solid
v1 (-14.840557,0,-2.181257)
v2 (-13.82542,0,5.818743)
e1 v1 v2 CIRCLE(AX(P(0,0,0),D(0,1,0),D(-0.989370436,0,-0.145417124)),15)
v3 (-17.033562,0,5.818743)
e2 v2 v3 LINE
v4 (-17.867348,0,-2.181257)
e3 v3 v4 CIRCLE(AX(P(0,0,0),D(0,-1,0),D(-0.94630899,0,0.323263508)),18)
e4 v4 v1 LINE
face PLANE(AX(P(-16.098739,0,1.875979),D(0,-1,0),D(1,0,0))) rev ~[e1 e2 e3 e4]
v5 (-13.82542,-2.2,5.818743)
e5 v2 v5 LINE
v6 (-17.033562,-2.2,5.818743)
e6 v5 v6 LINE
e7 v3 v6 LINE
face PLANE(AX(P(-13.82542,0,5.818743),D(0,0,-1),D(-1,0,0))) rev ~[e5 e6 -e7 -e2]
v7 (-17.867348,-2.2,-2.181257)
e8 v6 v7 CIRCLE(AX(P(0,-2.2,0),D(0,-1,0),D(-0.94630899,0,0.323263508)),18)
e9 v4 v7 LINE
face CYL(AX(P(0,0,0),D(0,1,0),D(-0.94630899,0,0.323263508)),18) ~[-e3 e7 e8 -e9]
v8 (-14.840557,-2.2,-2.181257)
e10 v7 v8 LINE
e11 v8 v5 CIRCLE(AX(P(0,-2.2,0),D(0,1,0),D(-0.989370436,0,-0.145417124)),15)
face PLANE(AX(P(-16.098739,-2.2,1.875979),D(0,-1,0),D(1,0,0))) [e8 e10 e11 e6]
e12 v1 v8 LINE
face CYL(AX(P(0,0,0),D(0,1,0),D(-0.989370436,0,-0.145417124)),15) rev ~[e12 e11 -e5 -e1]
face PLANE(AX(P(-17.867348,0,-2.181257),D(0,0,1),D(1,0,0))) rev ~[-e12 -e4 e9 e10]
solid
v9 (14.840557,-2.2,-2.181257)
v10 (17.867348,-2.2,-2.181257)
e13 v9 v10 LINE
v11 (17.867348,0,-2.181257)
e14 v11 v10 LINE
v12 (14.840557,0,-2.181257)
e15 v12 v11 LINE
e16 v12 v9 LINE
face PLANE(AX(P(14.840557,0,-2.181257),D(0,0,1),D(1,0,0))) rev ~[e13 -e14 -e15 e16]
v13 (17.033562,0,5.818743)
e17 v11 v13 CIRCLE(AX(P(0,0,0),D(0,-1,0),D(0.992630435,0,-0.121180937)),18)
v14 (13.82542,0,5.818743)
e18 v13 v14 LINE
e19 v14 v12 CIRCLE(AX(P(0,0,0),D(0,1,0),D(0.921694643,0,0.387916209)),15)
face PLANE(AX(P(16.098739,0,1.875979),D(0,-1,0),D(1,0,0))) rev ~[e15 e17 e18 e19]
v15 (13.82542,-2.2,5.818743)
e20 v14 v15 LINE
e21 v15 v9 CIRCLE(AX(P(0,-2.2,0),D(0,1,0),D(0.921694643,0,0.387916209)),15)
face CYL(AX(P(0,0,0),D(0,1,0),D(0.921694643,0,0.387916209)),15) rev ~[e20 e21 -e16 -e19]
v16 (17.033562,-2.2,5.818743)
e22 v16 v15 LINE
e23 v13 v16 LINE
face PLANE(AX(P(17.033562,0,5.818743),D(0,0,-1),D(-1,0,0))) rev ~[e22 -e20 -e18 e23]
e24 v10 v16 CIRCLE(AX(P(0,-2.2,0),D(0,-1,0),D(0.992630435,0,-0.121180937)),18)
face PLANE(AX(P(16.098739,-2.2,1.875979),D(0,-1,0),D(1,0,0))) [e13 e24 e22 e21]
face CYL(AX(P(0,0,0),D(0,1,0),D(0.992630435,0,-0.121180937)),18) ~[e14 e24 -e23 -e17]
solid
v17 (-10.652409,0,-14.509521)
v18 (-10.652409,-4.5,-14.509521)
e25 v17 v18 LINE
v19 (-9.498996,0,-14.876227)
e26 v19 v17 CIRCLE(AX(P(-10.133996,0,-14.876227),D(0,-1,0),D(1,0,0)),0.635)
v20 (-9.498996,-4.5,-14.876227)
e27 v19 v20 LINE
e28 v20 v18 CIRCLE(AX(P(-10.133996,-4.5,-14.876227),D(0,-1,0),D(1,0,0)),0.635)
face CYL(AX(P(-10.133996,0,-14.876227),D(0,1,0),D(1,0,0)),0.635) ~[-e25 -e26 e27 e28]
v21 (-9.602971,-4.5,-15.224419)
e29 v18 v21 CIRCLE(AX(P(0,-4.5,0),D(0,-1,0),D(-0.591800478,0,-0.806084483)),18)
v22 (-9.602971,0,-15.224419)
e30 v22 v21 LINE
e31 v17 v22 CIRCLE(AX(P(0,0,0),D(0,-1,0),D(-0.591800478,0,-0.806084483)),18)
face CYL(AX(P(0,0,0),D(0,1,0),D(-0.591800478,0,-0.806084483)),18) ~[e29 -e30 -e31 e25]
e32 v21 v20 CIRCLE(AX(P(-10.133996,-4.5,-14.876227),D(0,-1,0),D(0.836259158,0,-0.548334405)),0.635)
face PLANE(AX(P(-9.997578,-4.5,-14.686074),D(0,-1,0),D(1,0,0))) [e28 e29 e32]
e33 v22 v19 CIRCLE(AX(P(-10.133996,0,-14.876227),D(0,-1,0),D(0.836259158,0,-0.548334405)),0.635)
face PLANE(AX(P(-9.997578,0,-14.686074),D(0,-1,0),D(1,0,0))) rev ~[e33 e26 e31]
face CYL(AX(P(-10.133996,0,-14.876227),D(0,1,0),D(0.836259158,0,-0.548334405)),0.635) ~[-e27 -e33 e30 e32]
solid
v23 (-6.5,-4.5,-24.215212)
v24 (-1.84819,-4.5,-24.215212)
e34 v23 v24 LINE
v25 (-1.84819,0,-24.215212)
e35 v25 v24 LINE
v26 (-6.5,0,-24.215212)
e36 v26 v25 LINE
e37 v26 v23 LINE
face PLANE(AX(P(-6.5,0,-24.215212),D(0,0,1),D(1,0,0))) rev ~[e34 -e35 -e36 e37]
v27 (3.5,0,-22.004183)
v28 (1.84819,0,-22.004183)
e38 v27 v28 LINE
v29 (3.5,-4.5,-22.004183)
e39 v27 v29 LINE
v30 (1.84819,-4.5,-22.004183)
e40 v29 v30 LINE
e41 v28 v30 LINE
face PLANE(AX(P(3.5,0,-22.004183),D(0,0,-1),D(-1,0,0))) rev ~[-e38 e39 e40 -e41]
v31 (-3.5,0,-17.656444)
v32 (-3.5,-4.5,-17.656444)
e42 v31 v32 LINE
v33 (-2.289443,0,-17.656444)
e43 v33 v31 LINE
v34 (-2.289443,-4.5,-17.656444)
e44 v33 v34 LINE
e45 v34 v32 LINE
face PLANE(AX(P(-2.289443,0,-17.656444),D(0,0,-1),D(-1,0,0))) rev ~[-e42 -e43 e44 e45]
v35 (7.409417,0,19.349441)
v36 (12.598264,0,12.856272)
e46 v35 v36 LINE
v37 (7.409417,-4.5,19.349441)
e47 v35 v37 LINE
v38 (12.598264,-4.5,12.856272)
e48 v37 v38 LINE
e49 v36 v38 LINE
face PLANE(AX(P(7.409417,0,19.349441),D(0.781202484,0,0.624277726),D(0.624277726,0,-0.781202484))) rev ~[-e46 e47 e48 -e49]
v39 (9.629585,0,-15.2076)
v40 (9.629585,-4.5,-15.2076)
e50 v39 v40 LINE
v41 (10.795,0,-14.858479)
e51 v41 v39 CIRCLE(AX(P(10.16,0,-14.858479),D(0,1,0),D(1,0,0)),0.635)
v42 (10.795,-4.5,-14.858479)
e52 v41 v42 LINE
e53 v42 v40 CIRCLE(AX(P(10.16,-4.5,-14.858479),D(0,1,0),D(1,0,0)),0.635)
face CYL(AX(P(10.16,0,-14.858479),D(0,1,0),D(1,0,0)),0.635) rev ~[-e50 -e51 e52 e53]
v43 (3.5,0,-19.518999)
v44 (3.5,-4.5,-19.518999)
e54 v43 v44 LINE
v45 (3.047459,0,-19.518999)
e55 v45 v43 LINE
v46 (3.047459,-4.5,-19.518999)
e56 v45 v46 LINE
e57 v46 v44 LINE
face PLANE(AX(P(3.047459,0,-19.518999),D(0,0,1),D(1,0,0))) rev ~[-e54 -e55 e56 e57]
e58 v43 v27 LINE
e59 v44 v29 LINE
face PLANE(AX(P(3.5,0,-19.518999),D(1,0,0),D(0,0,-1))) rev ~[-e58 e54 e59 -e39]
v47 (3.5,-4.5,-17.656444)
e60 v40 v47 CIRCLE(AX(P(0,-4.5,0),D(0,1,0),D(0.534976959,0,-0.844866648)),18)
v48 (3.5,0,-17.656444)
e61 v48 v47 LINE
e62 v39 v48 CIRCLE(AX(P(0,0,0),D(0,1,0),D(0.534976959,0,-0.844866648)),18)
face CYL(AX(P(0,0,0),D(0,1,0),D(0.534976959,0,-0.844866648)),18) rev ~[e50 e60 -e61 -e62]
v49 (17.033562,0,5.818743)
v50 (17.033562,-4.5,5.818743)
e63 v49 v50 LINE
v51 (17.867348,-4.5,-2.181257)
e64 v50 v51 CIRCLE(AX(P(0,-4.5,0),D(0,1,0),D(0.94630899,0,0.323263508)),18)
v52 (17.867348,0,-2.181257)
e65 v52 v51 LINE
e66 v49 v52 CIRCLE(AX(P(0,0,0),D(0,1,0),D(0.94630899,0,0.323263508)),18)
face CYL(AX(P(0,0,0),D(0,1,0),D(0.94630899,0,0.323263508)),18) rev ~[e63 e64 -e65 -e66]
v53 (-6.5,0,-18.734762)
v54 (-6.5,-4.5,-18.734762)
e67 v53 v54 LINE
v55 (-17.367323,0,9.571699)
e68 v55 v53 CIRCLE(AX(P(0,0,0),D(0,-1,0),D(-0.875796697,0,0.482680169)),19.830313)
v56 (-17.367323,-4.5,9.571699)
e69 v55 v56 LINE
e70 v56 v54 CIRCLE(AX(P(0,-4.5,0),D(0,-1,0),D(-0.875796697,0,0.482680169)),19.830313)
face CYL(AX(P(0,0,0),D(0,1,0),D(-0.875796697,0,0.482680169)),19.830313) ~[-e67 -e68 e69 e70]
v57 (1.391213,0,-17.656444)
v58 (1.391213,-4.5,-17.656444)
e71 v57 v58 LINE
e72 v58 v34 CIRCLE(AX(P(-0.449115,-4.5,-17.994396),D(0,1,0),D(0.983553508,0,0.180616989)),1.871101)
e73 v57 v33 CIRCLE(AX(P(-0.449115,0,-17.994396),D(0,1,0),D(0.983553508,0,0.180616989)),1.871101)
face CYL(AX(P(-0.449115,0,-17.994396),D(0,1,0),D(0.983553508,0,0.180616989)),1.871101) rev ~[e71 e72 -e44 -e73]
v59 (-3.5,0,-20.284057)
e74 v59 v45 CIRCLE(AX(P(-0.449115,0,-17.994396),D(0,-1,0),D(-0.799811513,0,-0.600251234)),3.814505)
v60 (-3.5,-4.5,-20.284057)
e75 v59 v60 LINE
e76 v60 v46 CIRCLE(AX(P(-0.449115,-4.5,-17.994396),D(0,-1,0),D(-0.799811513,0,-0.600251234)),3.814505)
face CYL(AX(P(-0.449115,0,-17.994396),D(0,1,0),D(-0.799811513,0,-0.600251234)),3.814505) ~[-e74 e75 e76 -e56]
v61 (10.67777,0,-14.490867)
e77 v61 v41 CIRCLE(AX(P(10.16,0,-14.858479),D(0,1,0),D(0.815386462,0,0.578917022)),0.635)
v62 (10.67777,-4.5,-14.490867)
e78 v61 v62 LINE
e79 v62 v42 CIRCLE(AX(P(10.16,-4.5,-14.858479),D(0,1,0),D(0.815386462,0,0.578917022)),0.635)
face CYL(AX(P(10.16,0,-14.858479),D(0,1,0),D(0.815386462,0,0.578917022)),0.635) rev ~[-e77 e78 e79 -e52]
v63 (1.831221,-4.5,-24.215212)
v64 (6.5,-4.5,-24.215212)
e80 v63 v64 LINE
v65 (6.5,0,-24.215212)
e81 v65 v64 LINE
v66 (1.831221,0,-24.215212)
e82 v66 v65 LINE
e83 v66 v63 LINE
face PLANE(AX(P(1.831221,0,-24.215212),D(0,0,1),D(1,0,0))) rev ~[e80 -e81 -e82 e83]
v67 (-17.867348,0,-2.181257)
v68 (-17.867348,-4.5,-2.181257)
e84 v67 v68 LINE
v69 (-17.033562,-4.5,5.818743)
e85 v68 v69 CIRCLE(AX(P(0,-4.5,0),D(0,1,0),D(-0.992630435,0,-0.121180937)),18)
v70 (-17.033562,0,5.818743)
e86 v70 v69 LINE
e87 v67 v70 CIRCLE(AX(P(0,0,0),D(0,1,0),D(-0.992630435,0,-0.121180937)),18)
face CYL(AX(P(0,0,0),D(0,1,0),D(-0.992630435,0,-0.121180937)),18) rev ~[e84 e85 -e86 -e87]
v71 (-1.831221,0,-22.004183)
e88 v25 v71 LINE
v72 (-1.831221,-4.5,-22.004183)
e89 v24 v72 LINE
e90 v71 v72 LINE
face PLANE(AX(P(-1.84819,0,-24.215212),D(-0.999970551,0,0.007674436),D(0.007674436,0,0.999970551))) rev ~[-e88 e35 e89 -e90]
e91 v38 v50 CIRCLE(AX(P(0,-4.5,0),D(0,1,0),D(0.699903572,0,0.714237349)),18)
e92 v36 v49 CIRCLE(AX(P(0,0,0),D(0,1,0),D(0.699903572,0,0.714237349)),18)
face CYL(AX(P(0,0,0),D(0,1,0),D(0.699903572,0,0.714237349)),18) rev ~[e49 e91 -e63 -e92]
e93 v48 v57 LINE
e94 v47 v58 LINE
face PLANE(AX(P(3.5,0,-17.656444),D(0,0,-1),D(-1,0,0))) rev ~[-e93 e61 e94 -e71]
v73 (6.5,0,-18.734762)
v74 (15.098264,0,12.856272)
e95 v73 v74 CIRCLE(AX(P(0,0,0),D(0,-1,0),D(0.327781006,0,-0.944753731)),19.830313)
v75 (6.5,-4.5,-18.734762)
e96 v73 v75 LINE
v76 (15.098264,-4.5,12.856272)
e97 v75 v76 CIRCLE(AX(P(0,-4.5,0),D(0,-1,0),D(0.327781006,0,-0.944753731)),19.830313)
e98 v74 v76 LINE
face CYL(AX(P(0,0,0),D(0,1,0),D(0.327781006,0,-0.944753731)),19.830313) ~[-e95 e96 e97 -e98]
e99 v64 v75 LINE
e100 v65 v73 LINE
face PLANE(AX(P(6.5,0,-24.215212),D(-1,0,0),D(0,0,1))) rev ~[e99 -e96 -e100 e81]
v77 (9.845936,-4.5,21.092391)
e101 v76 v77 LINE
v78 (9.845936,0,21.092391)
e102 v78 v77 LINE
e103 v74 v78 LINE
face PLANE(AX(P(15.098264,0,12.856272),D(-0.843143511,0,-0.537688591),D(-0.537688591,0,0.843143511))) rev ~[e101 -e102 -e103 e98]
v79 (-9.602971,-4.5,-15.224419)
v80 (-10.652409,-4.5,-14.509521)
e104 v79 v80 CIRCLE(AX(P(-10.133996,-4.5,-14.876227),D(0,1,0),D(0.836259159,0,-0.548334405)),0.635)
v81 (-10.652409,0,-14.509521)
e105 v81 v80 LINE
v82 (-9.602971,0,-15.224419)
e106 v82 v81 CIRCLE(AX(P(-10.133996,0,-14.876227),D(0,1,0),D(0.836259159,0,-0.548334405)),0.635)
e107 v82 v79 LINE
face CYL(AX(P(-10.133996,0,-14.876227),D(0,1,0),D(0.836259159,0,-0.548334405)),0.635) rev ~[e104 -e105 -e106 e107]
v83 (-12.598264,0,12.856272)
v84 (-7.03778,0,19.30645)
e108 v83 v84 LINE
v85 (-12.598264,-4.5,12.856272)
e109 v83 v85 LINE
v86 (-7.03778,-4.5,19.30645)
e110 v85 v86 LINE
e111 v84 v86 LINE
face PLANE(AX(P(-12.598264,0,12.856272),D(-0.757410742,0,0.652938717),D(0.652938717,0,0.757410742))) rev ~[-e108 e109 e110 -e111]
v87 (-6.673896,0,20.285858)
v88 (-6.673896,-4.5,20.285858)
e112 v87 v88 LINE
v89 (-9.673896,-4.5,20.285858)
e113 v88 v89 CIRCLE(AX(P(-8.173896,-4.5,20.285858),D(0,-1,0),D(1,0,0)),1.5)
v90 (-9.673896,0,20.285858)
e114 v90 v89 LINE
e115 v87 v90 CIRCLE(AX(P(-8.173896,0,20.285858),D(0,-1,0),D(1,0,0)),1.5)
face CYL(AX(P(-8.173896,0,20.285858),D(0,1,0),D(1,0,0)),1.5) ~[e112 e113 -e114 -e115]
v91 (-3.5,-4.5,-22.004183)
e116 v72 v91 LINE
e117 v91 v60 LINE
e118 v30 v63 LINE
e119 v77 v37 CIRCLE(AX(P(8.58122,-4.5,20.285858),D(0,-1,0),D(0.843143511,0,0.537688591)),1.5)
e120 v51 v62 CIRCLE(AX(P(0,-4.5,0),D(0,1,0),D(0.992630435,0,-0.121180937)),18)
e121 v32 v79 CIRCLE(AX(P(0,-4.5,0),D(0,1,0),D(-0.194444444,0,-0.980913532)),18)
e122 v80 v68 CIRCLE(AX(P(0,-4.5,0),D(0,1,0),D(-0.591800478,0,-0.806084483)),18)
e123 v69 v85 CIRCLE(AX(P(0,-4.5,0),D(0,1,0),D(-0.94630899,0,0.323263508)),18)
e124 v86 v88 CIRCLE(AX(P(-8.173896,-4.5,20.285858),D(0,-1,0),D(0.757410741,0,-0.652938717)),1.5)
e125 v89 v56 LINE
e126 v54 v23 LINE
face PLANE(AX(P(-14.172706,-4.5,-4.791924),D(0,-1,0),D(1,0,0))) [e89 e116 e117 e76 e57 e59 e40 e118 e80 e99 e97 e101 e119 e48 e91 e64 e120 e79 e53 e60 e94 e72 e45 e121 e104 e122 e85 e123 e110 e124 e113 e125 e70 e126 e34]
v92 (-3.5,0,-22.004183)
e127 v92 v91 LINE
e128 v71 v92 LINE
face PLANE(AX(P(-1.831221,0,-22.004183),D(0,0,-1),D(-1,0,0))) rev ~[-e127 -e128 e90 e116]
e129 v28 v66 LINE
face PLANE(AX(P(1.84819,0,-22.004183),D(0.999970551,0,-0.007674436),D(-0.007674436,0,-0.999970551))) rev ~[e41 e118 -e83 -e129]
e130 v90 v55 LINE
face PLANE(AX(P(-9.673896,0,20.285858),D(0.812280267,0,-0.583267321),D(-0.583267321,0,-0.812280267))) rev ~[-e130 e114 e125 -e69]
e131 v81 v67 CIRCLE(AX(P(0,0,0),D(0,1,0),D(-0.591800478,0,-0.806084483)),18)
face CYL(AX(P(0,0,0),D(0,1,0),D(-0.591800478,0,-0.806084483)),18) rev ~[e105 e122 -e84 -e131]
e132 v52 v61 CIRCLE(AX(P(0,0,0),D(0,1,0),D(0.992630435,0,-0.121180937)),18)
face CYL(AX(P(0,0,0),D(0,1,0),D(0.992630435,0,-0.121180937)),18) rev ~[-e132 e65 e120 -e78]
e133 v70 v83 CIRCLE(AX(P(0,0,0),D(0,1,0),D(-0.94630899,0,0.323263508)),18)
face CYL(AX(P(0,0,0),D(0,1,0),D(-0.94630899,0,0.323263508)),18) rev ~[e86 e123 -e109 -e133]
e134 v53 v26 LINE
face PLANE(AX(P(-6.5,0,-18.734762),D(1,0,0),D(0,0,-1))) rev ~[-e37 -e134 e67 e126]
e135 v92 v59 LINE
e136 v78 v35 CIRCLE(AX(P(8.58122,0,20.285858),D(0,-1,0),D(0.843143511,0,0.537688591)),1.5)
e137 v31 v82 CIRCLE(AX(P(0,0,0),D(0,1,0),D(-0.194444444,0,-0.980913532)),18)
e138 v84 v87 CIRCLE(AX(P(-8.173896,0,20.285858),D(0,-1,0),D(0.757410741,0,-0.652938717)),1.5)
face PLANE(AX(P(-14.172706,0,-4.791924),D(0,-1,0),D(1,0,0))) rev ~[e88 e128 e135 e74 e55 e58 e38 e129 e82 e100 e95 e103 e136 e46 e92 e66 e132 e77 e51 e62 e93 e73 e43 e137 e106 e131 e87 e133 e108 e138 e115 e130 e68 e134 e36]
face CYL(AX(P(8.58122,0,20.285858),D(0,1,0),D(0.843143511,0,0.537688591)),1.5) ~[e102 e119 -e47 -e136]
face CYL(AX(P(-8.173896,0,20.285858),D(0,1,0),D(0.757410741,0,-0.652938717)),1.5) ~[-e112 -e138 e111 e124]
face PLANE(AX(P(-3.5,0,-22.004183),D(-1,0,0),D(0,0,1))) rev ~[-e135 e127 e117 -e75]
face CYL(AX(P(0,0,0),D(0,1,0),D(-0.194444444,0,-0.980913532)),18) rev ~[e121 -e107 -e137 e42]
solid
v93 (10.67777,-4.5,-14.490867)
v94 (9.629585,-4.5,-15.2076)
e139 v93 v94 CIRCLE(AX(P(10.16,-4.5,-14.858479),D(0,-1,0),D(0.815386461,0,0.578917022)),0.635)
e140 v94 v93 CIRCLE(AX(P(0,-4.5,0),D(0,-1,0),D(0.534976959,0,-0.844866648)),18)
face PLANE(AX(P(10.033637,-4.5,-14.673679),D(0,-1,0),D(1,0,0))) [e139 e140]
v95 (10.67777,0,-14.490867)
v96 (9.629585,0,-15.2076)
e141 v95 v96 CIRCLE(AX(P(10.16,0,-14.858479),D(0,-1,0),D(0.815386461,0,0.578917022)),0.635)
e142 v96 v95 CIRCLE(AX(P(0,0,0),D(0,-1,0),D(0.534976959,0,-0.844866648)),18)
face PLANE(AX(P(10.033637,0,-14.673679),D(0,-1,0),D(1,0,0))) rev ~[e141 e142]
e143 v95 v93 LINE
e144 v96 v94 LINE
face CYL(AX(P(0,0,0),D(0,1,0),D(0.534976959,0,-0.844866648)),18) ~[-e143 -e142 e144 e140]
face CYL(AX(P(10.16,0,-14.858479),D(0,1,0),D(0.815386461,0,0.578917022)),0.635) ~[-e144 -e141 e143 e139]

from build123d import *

# Parameters (mm, degrees)
F1_DEPTH = 4.5
F2_DEPTH = 2.2


with BuildPart() as f1:
    # F0 (on Front) → F1 (new body)
    with BuildSketch(Plane.XZ):
        with BuildLine():
            Line((-12.5982642878, 12.8562722799), (-17.3673227921, 9.5716989334))
            ThreePointArc((-17.3673227921, 9.5716989334), (-18.5128661298, -7.1073981948), (-6.5, -18.7347623801))
            ThreePointArc((-6.5, -18.7347623801), (-5.0153521077, -19.1856082696), (-3.5, -19.5189989866))
            Line((-3.5, -19.5189989866), (-3.5, -17.656443583))
            ThreePointArc((-3.5, -17.656443583), (-6.6633813431, -16.7212245089), (-9.6029714558, -15.2244191751))
            ThreePointArc((-9.6029714558, -15.2244191751), (-10.4915008811, -15.4010270522), (-10.6524086102, -14.5095206951))
            ThreePointArc((-10.6524086102, -14.5095206951), (-15.5351423919, -9.0917188069), (-17.8673478305, -2.1812568633))
            ThreePointArc((-17.8673478305, -2.1812568633), (-17.9030269403, 1.8659116739), (-17.033561821, 5.8187431367))
            ThreePointArc((-17.033561821, 5.8187431367), (-15.2280328258, 9.5972400332), (-12.5982642878, 12.8562722799))
        make_face()
        with BuildLine():
            Line((-9.6738959998, 20.2858578414), (-17.3673227921, 9.5716989334))
            Line((-17.3673227921, 9.5716989334), (-12.5982642878, 12.8562722799))
            Line((-12.5982642878, 12.8562722799), (-7.0377798874, 19.3064497655))
            ThreePointArc((-7.0377798874, 19.3064497655), (-8.696306677, 18.8797685539), (-9.6738959998, 20.2858578414))
        make_face()
        with BuildLine():
            ThreePointArc((-3.5, -19.5189989866), (-5.0153521077, -19.1856082696), (-6.5, -18.7347623801))
            Line((-6.5, -18.7347623801), (-6.5, -24.2152123027))
            Line((-6.5, -24.2152123027), (-1.8481902329, -24.2152123027))
            Line((-1.8481902329, -24.2152123027), (-1.8312213279, -22.0041828084))
            Line((-1.8312213279, -22.0041828084), (-3.5, -22.0041828084))
            Line((-3.5, -22.0041828084), (-3.5, -20.2840574679))
            ThreePointArc((-3.5, -20.2840574679), (-3.7451179805, -19.9145035902), (-3.945689667, -19.5189989866))
            Line((-3.945689667, -19.5189989866), (-3.5, -19.5189989866))
        make_face()
        with BuildLine():
            ThreePointArc((-6.6738959998, 20.2858578414), (-8.1738959998, 21.7858578414), (-9.6738959998, 20.2858578414))
            ThreePointArc((-9.6738959998, 20.2858578414), (-8.696306677, 18.8797685539), (-7.0377798874, 19.3064497655))
            ThreePointArc((-7.0377798874, 19.3064497655), (-6.7678067123, 19.7634471641), (-6.6738959998, 20.2858578414))
        make_face()
        with BuildLine():
            Line((-3.5, -17.656443583), (-3.5, -19.5189989866))
            Line((-3.5, -19.5189989866), (-3.5, -20.2840574679))
            ThreePointArc((-3.5, -20.2840574679), (-0.0064092924, -21.7831240851), (3.0474594497, -19.5189989866))
            Line((3.0474594497, -19.5189989866), (3.5, -19.5189989866))
            Line((3.5, -19.5189989866), (3.5, -17.656443583))
            Line((3.5, -17.656443583), (3.3503894936, -17.656443583))
            Line((3.3503894936, -17.656443583), (2.321347558, -17.656443583))
            Line((2.321347558, -17.656443583), (1.3912129293, -17.656443583))
            ThreePointArc((1.3912129293, -17.656443583), (-0.4491151087, -19.8654973153), (-2.2894431467, -17.656443583))
            Line((-2.2894431467, -17.656443583), (-2.854652442, -17.656443583))
            Line((-2.854652442, -17.656443583), (-3.5, -17.656443583))
        make_face()
        with BuildLine():
            Line((-3.5, -20.2840574679), (-3.5, -19.5189989866))
            Line((-3.5, -19.5189989866), (-3.945689667, -19.5189989866))
            ThreePointArc((-3.945689667, -19.5189989866), (-3.7451179805, -19.9145035902), (-3.5, -20.2840574679))
        make_face()
        with BuildLine():
            ThreePointArc((6.5, -18.7347623801), (5.0153521077, -19.1856082696), (3.5, -19.5189989866))
            Line((3.5, -19.5189989866), (3.5, -22.0041828084))
            Line((3.5, -22.0041828084), (1.8481902329, -22.0041828084))
            Line((1.8481902329, -22.0041828084), (1.8312213279, -24.2152123027))
            Line((1.8312213279, -24.2152123027), (6.5, -24.2152123027))
            Line((6.5, -24.2152123027), (6.5, -18.7347623801))
        make_face()
        with BuildLine():
            Line((3.5, -17.656443583), (3.5, -19.5189989866))
            ThreePointArc((3.5, -19.5189989866), (5.0153521077, -19.1856082696), (6.5, -18.7347623801))
            ThreePointArc((6.5, -18.7347623801), (19.1342526058, -5.2078497151), (15.0982642878, 12.8562722799))
            Line((15.0982642878, 12.8562722799), (12.5982642878, 12.8562722799))
            ThreePointArc((12.5982642878, 12.8562722799), (15.2280328258, 9.5972400332), (17.033561821, 5.8187431367))
            ThreePointArc((17.033561821, 5.8187431367), (17.9030269403, 1.8659116739), (17.8673478305, -2.1812568633))
            ThreePointArc((17.8673478305, -2.1812568633), (15.5430874553, -9.0781293423), (10.6777704031, -14.4908667518))
            ThreePointArc((10.6777704031, -14.4908667518), (10.7649831427, -14.665553176), (10.795, -14.8584790608))
            ThreePointArc((10.795, -14.8584790608), (10.3422246395, -15.4667710801), (9.6295852574, -15.2075996715))
            ThreePointArc((9.6295852574, -15.2075996715), (6.6780020503, -16.7153907707), (3.5, -17.656443583))
        make_face()
        with BuildLine():
            Line((12.5982642878, 12.8562722799), (15.0982642878, 12.8562722799))
            Line((15.0982642878, 12.8562722799), (9.8459355165, 21.0923907272))
            ThreePointArc((9.8459355165, 21.0923907272), (10.0211981842, 20.7059334899), (10.0812202505, 20.2858578414))
            ThreePointArc((10.0812202505, 20.2858578414), (9.0773524967, 18.8702827659), (7.4094165247, 19.3494412523))
            Line((7.4094165247, 19.3494412523), (12.5982642878, 12.8562722799))
        make_face()
        with BuildLine():
            ThreePointArc((10.0812202505, 20.2858578414), (10.0211981842, 20.7059334899), (9.8459355165, 21.0923907272))
            ThreePointArc((9.8459355165, 21.0923907272), (7.7085081809, 21.5058470395), (7.4094165247, 19.3494412523))
            ThreePointArc((7.4094165247, 19.3494412523), (9.0773524967, 18.8702827659), (10.0812202505, 20.2858578414))
        make_face()
    extrude(amount=F1_DEPTH)


with BuildPart() as f1b:
    # F0 (on Front) → F1, piece 2 (new body)
    with BuildSketch(Plane.XZ):
        with BuildLine():
            ThreePointArc((-10.6524086102, -14.5095206951), (-10.1339960215, -14.8762268279), (-9.6029714558, -15.2244191751))
            ThreePointArc((-9.6029714558, -15.2244191751), (-9.5255448734, -15.0579194266), (-9.4989960215, -14.8762268279))
            ThreePointArc((-9.4989960215, -14.8762268279), (-9.9415992879, -14.2710751966), (-10.6524086102, -14.5095206951))
        make_face()
    extrude(amount=F1_DEPTH)


with BuildPart() as f1c:
    # F0 (on Front) → F1, piece 3 (new body)
    with BuildSketch(Plane.XZ):
        with BuildLine():
            ThreePointArc((10.6777704031, -14.4908667518), (9.8015777778, -14.3343049384), (9.6295852574, -15.2075996715))
            ThreePointArc((9.6295852574, -15.2075996715), (10.16, -14.8584790608), (10.6777704031, -14.4908667518))
        make_face()
    extrude(amount=F1_DEPTH)


with BuildPart() as f2:
    # F0 (on Front) → F2 (new body)
    with BuildSketch(Plane.XZ):
        with BuildLine():
            Line((-13.8254196431, 5.8187431367), (-17.033561821, 5.8187431367))
            ThreePointArc((-17.033561821, 5.8187431367), (-17.9030269403, 1.8659116739), (-17.8673478305, -2.1812568633))
            Line((-17.8673478305, -2.1812568633), (-14.8405565427, -2.1812568633))
            ThreePointArc((-14.8405565427, -2.1812568633), (-14.8806769897, 1.8882405378), (-13.8254196431, 5.8187431367))
        make_face()
    extrude(amount=F2_DEPTH)


with BuildPart() as f2b:
    # F0 (on Front) → F2, piece 2 (new body)
    with BuildSketch(Plane.XZ):
        with BuildLine():
            Line((14.8405565427, -2.1812568633), (17.8673478305, -2.1812568633))
            ThreePointArc((17.8673478305, -2.1812568633), (17.9030269403, 1.8659116739), (17.033561821, 5.8187431367))
            Line((17.033561821, 5.8187431367), (13.8254196431, 5.8187431367))
            ThreePointArc((13.8254196431, 5.8187431367), (14.8806769897, 1.8882405378), (14.8405565427, -2.1812568633))
        make_face()
    extrude(amount=F2_DEPTH)


solid = Compound([f1.part, f1b.part, f1c.part, f2.part, f2b.part])
